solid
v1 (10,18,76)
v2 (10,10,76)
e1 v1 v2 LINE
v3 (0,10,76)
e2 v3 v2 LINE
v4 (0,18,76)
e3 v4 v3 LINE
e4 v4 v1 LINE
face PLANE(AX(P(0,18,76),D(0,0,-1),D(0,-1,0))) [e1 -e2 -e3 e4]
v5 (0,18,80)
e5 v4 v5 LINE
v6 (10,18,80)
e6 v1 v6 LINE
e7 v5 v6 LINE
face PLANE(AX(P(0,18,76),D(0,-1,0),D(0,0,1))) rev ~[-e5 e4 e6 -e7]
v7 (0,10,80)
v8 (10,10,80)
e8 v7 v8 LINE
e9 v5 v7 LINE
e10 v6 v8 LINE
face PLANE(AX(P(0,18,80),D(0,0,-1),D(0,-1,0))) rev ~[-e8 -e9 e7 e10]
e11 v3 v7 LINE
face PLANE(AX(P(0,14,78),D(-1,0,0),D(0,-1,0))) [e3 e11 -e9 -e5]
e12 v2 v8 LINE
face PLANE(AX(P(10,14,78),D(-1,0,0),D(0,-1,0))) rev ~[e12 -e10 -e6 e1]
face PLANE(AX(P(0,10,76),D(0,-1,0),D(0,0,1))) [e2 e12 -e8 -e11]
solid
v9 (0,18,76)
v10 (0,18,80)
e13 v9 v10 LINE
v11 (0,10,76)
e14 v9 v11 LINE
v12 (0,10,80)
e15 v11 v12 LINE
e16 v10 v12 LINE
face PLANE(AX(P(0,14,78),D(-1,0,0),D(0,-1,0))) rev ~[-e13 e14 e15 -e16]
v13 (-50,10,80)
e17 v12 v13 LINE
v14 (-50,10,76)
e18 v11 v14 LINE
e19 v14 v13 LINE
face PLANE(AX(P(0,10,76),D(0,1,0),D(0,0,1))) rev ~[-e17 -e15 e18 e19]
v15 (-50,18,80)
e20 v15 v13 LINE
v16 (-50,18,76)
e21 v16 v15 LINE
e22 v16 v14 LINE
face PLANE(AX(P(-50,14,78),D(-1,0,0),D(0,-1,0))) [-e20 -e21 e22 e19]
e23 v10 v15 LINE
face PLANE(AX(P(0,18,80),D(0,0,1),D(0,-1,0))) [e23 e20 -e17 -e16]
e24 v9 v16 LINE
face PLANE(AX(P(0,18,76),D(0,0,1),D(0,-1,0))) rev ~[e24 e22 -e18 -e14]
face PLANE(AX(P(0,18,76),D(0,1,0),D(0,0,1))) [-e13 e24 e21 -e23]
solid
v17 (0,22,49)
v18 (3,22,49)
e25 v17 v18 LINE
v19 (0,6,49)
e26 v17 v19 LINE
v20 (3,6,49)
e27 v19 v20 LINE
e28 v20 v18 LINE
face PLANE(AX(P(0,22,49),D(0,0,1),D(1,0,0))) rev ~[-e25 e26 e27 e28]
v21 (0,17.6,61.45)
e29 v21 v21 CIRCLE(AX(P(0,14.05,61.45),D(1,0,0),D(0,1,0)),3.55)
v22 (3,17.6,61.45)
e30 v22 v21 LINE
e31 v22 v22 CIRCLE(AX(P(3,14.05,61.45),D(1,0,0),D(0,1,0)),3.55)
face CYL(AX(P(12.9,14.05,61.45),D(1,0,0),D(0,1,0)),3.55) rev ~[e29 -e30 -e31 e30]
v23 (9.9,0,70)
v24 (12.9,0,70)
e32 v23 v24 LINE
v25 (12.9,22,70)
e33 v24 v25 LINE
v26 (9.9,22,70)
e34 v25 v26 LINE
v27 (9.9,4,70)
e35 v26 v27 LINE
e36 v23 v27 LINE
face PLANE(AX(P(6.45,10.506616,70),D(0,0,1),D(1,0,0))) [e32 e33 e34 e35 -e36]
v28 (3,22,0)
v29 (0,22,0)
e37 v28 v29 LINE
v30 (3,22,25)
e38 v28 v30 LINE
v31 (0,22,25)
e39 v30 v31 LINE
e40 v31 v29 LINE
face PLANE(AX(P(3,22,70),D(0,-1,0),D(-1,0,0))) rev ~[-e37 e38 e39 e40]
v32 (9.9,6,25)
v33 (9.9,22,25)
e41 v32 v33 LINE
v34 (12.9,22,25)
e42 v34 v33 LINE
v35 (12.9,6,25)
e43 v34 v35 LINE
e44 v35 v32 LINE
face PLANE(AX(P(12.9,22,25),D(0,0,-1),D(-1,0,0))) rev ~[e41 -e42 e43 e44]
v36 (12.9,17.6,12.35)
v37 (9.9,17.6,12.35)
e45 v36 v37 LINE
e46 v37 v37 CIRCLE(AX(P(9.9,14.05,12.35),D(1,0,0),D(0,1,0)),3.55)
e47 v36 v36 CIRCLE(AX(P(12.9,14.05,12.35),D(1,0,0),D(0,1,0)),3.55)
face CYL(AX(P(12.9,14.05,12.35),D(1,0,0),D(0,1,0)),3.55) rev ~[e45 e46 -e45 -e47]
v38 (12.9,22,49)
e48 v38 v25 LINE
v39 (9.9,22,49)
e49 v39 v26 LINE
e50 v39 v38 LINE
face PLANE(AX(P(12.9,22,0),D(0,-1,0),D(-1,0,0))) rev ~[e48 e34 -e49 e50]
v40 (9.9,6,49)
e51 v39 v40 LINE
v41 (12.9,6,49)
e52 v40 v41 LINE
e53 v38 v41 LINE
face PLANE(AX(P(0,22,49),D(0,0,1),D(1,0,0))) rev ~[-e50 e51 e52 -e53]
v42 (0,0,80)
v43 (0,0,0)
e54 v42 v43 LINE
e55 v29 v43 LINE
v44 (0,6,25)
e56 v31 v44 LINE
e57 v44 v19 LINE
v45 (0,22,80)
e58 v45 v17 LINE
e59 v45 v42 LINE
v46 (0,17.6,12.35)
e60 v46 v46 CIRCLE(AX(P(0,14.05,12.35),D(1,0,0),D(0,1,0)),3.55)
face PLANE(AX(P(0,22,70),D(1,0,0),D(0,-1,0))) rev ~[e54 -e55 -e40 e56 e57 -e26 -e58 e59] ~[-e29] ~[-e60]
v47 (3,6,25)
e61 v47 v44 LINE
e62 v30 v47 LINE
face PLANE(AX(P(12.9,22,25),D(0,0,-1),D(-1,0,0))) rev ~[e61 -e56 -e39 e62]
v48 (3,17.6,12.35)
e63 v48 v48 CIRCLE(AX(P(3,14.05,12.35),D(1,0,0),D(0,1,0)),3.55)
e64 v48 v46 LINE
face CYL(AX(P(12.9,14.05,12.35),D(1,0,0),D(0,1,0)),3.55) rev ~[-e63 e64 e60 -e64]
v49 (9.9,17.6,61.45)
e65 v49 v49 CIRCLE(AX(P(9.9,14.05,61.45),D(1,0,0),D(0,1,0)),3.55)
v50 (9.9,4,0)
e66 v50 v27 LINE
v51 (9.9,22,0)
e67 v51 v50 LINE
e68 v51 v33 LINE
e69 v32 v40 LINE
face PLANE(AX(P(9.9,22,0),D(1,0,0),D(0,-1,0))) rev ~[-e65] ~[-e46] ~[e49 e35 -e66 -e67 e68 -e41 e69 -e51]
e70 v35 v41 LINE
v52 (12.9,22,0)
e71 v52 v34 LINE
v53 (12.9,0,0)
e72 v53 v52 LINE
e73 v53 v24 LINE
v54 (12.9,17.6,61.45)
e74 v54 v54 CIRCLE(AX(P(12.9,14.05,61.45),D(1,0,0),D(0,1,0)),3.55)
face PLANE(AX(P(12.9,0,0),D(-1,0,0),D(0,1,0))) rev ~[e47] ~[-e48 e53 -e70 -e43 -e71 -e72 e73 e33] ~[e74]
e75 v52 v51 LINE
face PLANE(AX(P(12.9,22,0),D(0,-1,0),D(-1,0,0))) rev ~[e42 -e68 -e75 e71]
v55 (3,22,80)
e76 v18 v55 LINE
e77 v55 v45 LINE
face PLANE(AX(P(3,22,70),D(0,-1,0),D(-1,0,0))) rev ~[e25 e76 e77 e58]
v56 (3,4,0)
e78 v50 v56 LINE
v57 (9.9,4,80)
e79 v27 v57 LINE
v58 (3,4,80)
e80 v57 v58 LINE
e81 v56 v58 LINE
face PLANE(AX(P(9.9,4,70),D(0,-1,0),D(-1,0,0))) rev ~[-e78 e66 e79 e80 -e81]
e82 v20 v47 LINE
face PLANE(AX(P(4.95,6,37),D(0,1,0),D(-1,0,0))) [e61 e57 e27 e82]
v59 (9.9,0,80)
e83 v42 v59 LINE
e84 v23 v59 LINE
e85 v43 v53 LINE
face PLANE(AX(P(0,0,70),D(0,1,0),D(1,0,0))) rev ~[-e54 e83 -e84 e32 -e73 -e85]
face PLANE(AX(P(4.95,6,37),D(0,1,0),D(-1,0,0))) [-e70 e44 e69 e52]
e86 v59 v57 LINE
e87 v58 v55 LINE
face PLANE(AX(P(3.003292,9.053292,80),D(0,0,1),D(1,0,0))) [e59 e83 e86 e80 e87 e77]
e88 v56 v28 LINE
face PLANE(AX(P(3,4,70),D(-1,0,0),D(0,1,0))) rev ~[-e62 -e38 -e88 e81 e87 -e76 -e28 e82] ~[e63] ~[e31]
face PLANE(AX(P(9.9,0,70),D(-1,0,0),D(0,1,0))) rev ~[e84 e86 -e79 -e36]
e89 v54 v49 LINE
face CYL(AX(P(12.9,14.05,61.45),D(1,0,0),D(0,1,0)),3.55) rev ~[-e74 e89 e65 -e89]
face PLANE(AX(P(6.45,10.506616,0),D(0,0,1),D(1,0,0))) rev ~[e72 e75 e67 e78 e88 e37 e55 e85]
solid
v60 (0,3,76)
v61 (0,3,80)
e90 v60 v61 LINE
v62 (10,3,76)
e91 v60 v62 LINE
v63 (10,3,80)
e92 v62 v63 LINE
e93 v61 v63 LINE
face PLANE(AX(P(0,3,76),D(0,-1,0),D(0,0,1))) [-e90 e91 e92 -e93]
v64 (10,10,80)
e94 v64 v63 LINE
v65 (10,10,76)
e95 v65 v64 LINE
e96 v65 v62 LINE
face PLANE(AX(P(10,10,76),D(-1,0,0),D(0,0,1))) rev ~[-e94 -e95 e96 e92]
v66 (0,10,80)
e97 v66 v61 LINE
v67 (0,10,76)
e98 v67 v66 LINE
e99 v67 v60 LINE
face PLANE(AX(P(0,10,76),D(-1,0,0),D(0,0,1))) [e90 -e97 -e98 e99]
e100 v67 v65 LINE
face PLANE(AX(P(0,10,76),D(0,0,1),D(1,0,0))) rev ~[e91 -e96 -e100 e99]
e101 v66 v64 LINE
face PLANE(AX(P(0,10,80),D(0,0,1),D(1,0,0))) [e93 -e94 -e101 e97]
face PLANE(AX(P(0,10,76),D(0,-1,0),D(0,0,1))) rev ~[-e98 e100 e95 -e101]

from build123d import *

# Parameters (mm, degrees)
F1_DEPTH  = 70
F2_R      = 3.55
F3_DEPTH  = 12.901
F5_DEPTH  = 10
F6_W      = 8
F6_H      = 4
F7_DEPTH  = 50
F8_W      = 9.9
F8_H      = 24
F8_W_2    = 3
F9_DEPTH  = 16
F10_DEPTH = 10
F11_DEPTH = 7


# Not quite as in the source:
# - a feature names something its author has since deleted; it is built from what else it names


with BuildPart() as f1:
    # F0 (on Top) → F1 (new body)
    with BuildSketch(Plane.XY):
        Polygon((0, 22), (0, 0), (12.9, 0), (12.9, 22), (9.9, 22), (9.9, 4), (3, 4), (3, 22), align=None)
    extrude(amount=F1_DEPTH)

    # F2 (on face) → F3 (cut, through all)
    with BuildSketch(Plane.YZ.offset(12.9)):
        with Locations((14.05, 61.45)):
            Circle(F2_R)
        with Locations((14.05, 12.35)):
            Circle(F2_R)
    extrude(amount=-F3_DEPTH, mode=Mode.SUBTRACT)

    # F4 (on face) → F5 (join)
    with BuildSketch(Plane.XY.offset(70)):
        Polygon((9.9, 0), (9.9, 4), (3, 4), (3, 22), (0, 22), (0, 0), align=None)
    extrude(amount=F5_DEPTH)

    # F8 (on face) → F9 (cut)
    with BuildSketch(Plane(origin=(0, 22, 0), x_dir=(-1, 0, 0), z_dir=(0, 1, 0))):
        with Locations((-4.95, 37)):
            Rectangle(F8_W, F8_H)
        with Locations((-11.4, 37)):
            Rectangle(F8_W_2, F8_H)
    extrude(amount=-F9_DEPTH, mode=Mode.SUBTRACT)


with BuildPart() as f7:
    # F6 (on face) → F7 (new body)
    with BuildSketch(Plane(origin=(0, 0, 0), x_dir=(0, -1, 0), z_dir=(-1, 0, 0))):
        with Locations((-14, 78)):
            Rectangle(F6_W, F6_H)
    extrude(amount=F7_DEPTH)


with BuildPart() as f10:
    # F6 (on face) → F10 (new body)
    with BuildSketch(Plane(origin=(0, 0, 0), x_dir=(0, -1, 0), z_dir=(-1, 0, 0))):
        with Locations((-14, 78)):
            Rectangle(F6_W, F6_H)
    extrude(amount=-F10_DEPTH)


with BuildPart() as f11:
    # F11 (new): a face of the model
    f11_faces = [f10.part.faces().sort_by_distance(p)[0] for p in [
        (5, 10, 78),
    ]]
    extrude(f11_faces, amount=F11_DEPTH)


solid = Compound([f1.part, f7.part, f10.part, f11.part])
